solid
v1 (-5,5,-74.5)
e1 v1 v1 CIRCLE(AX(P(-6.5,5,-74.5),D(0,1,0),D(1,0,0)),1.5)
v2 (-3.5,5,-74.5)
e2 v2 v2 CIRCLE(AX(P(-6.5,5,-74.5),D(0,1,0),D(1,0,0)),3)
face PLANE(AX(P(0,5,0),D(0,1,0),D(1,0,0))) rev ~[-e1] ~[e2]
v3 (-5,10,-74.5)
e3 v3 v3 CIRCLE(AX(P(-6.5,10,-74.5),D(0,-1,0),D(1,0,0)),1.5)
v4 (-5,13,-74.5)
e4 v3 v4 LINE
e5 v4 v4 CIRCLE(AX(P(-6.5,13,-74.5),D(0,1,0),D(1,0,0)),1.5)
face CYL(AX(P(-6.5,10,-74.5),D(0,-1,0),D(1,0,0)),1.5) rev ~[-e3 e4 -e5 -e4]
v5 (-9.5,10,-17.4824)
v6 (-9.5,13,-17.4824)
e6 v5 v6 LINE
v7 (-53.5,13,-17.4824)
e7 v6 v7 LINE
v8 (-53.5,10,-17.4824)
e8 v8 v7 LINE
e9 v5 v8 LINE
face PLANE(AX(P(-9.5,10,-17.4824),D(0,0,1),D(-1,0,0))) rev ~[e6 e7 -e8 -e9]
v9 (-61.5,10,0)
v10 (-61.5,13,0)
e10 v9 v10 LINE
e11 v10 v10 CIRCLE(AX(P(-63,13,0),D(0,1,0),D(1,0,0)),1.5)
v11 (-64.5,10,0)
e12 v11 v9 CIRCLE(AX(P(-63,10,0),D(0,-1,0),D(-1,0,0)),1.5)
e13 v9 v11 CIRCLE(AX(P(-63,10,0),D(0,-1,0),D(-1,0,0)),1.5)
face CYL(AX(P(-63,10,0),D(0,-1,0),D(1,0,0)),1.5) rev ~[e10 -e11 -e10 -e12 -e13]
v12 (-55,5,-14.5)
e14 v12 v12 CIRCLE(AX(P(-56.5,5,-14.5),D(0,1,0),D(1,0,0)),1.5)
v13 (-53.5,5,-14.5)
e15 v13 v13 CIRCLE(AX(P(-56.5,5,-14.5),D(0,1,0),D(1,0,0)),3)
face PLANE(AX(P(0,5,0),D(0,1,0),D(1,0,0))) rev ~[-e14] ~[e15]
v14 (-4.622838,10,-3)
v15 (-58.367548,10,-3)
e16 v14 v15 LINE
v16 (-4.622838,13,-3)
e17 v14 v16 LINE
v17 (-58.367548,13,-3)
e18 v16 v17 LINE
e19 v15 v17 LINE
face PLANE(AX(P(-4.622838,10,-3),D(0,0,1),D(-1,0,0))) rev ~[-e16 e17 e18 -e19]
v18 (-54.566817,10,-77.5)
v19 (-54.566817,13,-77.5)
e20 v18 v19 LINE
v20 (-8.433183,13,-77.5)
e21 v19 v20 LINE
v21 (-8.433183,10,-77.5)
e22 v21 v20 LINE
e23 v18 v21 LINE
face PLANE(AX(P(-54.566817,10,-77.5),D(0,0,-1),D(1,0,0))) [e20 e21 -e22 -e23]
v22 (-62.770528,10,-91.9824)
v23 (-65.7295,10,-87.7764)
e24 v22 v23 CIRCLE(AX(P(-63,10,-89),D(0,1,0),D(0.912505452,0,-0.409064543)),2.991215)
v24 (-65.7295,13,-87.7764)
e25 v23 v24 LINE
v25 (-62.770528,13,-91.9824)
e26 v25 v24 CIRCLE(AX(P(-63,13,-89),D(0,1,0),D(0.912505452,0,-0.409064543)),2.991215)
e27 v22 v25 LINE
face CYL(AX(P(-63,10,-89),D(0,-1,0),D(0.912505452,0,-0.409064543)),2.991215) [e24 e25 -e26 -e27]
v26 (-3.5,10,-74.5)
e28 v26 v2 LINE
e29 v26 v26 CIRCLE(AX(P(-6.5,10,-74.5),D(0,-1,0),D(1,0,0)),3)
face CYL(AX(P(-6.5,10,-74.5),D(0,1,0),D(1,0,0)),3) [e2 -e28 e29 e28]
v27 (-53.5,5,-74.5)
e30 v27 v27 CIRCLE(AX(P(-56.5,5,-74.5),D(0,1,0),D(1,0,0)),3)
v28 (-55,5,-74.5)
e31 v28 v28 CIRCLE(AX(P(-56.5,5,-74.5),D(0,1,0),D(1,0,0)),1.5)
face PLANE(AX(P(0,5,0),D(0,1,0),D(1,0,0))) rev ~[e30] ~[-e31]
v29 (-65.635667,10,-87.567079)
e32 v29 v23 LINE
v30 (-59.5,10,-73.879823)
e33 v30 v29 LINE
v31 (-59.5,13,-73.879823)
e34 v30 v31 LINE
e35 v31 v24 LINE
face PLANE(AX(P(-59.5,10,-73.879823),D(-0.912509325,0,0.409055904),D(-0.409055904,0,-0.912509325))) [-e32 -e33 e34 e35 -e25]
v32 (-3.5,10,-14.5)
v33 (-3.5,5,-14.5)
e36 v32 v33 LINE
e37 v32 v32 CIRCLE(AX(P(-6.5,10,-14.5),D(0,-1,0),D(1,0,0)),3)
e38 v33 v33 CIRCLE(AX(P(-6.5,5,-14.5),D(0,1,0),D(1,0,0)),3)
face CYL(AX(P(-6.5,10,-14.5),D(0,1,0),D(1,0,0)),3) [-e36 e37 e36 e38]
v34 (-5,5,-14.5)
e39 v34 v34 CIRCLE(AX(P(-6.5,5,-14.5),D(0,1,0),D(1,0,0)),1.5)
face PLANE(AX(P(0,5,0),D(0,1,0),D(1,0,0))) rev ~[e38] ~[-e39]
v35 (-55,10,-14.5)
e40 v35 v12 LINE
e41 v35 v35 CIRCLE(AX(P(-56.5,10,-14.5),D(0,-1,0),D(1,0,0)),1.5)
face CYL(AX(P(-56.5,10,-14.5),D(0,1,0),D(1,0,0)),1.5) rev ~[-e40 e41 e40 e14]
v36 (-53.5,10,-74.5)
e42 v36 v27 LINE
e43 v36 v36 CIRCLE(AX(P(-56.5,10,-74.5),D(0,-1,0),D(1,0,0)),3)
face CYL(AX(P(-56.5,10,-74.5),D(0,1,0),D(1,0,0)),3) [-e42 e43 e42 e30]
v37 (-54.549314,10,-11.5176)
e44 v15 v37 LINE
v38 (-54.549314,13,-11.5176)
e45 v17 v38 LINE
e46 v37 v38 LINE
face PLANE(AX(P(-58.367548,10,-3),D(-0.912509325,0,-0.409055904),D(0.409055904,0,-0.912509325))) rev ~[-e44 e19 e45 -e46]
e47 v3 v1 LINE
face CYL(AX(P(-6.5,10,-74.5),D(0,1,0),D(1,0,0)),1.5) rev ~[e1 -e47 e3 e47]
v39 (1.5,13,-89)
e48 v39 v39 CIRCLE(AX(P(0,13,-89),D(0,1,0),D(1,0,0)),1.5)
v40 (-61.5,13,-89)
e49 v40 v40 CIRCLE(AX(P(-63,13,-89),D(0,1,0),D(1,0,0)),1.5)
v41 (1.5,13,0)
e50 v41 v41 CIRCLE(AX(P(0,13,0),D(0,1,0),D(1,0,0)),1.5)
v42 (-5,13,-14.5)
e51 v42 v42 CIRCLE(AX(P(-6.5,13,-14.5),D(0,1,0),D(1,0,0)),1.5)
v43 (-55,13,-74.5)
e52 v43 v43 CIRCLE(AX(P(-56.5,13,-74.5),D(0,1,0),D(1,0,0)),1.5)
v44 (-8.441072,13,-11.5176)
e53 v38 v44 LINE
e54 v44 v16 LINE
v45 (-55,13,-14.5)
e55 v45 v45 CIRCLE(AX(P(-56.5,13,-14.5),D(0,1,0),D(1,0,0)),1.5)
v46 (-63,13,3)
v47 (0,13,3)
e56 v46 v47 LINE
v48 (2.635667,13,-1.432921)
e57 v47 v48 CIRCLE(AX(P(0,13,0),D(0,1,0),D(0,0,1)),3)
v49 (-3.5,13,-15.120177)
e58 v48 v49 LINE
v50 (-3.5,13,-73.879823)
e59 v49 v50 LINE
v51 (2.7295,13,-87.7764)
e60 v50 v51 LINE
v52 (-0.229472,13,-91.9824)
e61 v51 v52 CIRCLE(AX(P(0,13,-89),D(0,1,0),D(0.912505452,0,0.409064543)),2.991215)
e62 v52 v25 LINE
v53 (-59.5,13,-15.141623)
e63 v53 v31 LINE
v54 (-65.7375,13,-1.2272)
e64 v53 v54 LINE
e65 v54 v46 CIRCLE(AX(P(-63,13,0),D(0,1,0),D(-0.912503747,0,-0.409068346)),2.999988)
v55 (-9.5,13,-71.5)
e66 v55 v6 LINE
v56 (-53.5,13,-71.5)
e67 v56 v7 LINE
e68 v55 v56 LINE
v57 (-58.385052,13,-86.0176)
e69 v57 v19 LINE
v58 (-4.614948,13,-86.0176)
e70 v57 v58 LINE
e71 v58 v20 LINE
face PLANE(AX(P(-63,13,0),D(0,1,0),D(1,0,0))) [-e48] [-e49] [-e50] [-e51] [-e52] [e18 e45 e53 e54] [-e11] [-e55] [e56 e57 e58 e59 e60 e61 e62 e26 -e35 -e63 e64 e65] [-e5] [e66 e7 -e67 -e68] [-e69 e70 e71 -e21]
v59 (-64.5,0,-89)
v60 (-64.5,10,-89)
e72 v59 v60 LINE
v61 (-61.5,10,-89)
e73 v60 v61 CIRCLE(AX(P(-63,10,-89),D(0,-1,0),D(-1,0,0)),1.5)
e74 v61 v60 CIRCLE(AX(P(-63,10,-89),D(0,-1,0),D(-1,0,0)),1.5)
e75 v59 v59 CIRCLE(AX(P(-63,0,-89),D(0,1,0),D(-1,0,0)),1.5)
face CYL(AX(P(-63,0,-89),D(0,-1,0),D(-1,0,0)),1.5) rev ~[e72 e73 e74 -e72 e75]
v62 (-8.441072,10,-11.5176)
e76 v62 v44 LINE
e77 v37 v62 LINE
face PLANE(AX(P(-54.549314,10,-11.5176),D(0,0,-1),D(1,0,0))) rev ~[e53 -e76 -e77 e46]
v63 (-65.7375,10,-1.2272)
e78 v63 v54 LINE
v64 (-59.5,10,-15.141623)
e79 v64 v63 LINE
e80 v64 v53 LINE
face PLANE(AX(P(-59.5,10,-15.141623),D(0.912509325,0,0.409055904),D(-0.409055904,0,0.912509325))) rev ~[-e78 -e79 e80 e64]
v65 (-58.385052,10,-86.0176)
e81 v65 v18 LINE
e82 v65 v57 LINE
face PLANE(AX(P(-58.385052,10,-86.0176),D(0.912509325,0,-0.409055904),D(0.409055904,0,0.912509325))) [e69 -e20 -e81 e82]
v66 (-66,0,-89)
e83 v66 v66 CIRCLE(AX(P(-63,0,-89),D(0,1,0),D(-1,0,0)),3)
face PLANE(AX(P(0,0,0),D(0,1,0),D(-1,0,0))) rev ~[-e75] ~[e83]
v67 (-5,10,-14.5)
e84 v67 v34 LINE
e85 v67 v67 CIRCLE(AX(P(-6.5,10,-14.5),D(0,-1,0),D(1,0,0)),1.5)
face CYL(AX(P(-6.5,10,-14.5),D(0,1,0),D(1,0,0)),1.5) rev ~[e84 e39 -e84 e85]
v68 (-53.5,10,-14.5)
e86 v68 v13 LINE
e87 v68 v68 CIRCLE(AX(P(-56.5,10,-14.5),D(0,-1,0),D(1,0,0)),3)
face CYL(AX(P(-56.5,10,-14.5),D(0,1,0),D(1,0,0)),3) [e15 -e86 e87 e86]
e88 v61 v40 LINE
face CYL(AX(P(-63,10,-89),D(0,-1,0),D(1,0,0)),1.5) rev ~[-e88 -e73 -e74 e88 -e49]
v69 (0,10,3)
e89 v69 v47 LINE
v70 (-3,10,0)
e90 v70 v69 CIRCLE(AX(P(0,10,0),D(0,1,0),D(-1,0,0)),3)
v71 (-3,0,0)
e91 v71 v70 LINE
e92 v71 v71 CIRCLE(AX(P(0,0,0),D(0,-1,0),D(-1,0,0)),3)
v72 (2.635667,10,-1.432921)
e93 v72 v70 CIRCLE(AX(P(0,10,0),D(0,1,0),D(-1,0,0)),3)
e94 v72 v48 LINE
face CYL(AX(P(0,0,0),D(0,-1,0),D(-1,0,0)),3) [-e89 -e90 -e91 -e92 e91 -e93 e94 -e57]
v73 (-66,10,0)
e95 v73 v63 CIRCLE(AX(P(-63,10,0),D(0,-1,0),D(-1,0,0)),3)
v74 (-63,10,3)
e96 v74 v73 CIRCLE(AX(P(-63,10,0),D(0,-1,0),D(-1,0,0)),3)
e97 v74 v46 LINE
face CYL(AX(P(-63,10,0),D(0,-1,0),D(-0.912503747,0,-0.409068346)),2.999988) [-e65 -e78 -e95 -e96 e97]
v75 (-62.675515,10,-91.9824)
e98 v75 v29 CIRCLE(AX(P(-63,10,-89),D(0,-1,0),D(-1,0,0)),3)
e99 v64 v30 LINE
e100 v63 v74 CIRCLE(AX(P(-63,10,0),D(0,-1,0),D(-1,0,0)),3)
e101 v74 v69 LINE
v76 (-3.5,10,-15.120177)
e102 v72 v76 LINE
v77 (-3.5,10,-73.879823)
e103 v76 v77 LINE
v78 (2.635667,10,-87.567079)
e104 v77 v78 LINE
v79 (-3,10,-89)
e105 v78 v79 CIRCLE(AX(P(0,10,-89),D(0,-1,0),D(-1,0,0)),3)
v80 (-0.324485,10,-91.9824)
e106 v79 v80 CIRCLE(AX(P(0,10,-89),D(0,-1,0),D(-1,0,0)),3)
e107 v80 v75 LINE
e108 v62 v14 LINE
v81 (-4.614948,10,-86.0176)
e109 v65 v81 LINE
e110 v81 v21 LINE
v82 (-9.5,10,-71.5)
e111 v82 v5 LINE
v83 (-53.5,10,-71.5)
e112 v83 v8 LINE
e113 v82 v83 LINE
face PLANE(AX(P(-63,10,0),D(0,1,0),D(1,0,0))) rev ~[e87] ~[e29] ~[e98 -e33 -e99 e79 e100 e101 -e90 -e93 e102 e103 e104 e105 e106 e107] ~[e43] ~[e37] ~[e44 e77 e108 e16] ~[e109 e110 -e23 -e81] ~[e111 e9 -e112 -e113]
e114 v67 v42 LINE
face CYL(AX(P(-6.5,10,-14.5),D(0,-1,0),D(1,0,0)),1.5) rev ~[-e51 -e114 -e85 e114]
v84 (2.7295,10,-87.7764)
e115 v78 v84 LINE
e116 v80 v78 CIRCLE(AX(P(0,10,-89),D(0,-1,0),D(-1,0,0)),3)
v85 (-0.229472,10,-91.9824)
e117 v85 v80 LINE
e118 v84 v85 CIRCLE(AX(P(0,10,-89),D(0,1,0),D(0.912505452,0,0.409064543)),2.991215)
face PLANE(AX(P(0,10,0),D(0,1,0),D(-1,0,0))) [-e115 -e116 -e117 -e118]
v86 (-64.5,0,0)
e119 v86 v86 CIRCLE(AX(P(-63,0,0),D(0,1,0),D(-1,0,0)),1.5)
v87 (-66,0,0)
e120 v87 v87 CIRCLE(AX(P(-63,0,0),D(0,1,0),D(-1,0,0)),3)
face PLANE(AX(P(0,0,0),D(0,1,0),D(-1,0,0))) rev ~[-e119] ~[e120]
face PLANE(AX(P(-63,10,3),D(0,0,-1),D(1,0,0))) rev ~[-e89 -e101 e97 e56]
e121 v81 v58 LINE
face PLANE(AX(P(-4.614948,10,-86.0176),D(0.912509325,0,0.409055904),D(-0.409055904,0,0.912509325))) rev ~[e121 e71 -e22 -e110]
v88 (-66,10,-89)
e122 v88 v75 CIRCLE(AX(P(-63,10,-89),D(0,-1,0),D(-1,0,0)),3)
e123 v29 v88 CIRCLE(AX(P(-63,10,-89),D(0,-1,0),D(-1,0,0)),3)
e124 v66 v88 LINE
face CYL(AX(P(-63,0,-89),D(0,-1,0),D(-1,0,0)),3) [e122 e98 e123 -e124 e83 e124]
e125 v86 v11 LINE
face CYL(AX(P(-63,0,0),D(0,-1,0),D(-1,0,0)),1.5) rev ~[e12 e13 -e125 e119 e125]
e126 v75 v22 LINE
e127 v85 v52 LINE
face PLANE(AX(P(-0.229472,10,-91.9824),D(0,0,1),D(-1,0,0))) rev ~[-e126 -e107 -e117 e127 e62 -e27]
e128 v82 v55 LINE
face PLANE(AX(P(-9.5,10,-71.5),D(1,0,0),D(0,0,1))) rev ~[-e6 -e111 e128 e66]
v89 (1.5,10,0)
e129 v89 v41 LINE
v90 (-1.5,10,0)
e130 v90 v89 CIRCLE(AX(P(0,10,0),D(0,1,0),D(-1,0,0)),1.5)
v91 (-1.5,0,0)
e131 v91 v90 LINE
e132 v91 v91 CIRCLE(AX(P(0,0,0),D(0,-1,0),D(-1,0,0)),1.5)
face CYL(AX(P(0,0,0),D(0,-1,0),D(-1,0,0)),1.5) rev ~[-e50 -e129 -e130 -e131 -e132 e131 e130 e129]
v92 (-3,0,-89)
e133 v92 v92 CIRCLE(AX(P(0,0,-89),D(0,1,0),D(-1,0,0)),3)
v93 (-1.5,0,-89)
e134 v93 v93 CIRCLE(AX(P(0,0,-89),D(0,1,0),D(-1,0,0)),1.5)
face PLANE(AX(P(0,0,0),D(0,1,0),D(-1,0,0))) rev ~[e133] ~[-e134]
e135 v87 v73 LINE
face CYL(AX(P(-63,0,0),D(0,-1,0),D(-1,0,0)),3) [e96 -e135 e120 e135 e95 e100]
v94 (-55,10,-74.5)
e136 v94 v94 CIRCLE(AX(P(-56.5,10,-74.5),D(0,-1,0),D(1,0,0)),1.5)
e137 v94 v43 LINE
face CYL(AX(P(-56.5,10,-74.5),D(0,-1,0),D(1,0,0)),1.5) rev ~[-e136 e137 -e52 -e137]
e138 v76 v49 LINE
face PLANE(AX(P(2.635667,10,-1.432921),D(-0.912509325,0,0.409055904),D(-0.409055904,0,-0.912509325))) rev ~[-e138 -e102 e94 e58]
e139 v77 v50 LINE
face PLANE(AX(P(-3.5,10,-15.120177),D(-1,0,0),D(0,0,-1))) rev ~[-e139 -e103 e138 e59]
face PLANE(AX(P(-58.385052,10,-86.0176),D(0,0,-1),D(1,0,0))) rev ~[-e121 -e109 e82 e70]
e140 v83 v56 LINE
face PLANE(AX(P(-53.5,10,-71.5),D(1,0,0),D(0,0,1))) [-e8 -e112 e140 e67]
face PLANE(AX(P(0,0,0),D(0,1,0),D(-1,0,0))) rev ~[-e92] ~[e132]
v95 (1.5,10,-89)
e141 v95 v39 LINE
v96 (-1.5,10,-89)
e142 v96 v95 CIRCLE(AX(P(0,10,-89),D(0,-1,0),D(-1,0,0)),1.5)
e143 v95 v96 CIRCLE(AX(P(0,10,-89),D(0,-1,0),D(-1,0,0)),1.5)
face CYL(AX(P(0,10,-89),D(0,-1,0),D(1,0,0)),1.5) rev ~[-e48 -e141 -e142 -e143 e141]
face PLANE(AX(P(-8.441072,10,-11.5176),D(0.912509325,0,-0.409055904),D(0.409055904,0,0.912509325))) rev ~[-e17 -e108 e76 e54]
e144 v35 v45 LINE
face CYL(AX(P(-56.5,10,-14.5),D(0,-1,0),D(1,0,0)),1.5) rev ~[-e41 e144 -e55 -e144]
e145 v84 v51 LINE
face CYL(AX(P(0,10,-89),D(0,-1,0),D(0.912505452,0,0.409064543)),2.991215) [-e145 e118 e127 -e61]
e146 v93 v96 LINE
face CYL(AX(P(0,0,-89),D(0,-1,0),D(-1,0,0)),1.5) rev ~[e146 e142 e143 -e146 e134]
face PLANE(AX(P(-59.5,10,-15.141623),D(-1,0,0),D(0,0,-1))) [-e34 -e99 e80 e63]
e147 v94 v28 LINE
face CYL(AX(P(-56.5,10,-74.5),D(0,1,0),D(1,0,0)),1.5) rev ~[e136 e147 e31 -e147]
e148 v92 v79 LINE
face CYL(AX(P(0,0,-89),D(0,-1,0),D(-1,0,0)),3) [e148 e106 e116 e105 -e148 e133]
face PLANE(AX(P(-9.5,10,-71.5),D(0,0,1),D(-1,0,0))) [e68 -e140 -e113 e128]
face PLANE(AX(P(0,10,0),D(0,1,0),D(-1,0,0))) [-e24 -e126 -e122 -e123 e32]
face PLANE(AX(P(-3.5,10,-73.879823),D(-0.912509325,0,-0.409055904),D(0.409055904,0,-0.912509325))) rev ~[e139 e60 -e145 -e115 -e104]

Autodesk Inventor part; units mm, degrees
ref_plane "YZ Plane" through (0, 0, 0) normal (1, 0, 0) x (0, 1, 0)
ref_plane "XZ Plane" through (0, 0, 0) normal (0, 1, 0) x (-1, 0, 0)
ref_plane "XY Plane" through (0, 0, 0) normal (0, 0, 1) x (1, 0, 0)
sketch "Sketch1" plane through (0, 0, 0) normal (0, 1, 0) x (-1, 0, 0)
  line L0 (0, 0) -> (63, 0)
  line L1 (63, 0) -> (63, -89)
  line L2 (63, -89) -> (0, -89)
  line L3 (0, -89) -> (0, 0)
  circle A0 centre (0, 0) radius 1.5
  circle A1 centre (63, 0) radius 1.5
  circle A2 centre (0, -89) radius 1.5
  circle A3 centre (63, -89) radius 1.5
  circle A4 centre (0, 0) radius 3
  circle A5 centre (0, -89) radius 3
  circle A6 centre (63, -89) radius 3
  circle A7 centre (63, 0) radius 3
  dimension "d0" = 63
  dimension "d1" = 89
  dimension "d2" = 3
  dimension "d3" = 3
  dimension "d4" = 3
  dimension "d5" = 3
  dimension "d6" = 6
  dimension "d7" = 6
  dimension "d8" = 6
  dimension "d9" = 6
extrude "Extrusion1" add sketch "Sketch1" along normal blind 10 contours A0 L3 A4 L0 | L0 A4 L3 A0 | A7 L1 A1 L0 | L0 A1 L1 A7 | A5 L2 A2 L3 | L3 A2 L2 A5 | A6 L2 A3 L1 | L1 A3 L2 A6
sketch "Sketch2" plane through (0, 10, 0) normal (0, 1, 0) x (1, 0, 0)
  circle A0 centre (0, 0) radius 1.5 projected
  circle A1 centre (-63, 89) radius 1.5 projected
  line L0 (0, 0) -> (-63, 0)
  line L1 (-63, 0) -> (-63, 89)
  line L2 (-63, 89) -> (0, 89)
  line L3 (0, 89) -> (0, 0)
  line L4 (-63, 44.5) -> (-31.5, 44.5)
  line L5 (-6.5, 14.5) -> (-56.5, 14.5)
  line L6 (-56.5, 14.5) -> (-56.5, 74.5)
  line L7 (-56.5, 74.5) -> (-6.5, 74.5)
  line L8 (-6.5, 74.5) -> (-6.5, 14.5)
  line L9 (-6.5, 14.5) -> (-56.5, 74.5) construction
  line L10 (-56.5, 14.5) -> (-6.5, 74.5) construction
  circle A2 centre (-56.5, 14.5) radius 1.5
  circle A3 centre (-6.5, 14.5) radius 1.5
  circle A4 centre (-6.5, 74.5) radius 1.5
  circle A5 centre (-56.5, 74.5) radius 1.5
  circle A6 centre (-56.5, 14.5) radius 3
  circle A7 centre (-56.5, 74.5) radius 3
  circle A8 centre (-6.5, 14.5) radius 3
  circle A9 centre (-6.5, 74.5) radius 3
  dimension "d12" = 50
  dimension "d13" = 60
  dimension "d14" = 3
  dimension "d15" = 3
  dimension "d16" = 3
  dimension "d17" = 3
  dimension "d18" = 6
  dimension "d19" = 6
  dimension "d20" = 6
  dimension "d21" = 6
extrude "Extrusion2" add sketch "Sketch2" against normal blind 5 contours A6 L6 A2 L5 | L5 A2 L6 A6 | A8 L8 A3 L5 | L5 A3 L8 A8 | A9 L7 A4 L8 | L8 A4 L7 A9 | A7 L7 A5 L6 | L6 A5 L7 A7
sketch "Sketch3" plane through (-63, 10, 0) normal (0, 1, 0) x (1, 0, 0)
  circle A0 centre (0, 0) radius 1.5 projected
  circle A1 centre (6.5, 14.5) radius 1.5 projected
  line L0 (0, 0) -> (6.5, 14.5) construction
  line L1 (2.7375, -1.2272) -> (9.2375, 13.2728)
  line L2 (3.7625, 15.7272) -> (-2.7375, 1.2272)
  arc A2 (-2.7375, 1.2272) -> (2.7375, -1.2272) centre (0, 0) ccw
  arc A3 (9.2375, 13.2728) -> (3.7625, 15.7272) centre (6.5, 14.5) ccw
  circle A4 centre (6.5, 74.5) radius 1.5 projected
  line L3 (6.5, 14.5) -> (6.5, 74.5) construction
  line L4 (3.5, 14.5) -> (3.5, 74.5)
  line L5 (9.5, 74.5) -> (9.5, 14.5)
  arc A5 (3.5, 14.5) -> (9.5, 14.5) centre (6.5, 14.5) ccw
  arc A6 (9.5, 74.5) -> (3.5, 74.5) centre (6.5, 74.5) ccw
  circle A7 centre (0, 89) radius 1.5 projected
  line L6 (6.5, 74.5) -> (0, 89) construction
  line L7 (3.7705, 73.2764) -> (-2.7295, 87.7764)
  line L8 (2.7295, 90.2236) -> (9.2295, 75.7236)
  arc A8 (3.7705, 73.2764) -> (9.2295, 75.7236) centre (6.5, 74.5) ccw
  arc A9 (2.7295, 90.2236) -> (-2.7295, 87.7764) centre (0, 89) ccw
  circle A10 centre (63, 89) radius 1.5 projected
  line L9 (0, 89) -> (63, 89) construction
  line L10 (0, 86.0176) -> (63, 86.0176)
  line L11 (63, 91.9824) -> (0, 91.9824)
  arc A11 (0, 91.9824) -> (0, 86.0176) centre (0, 89) ccw
  arc A12 (63, 86.0176) -> (63, 91.9824) centre (63, 89) ccw
  circle A13 centre (56.5, 74.5) radius 1.5 projected
  line L12 (63, 89) -> (56.5, 74.5) construction
  line L13 (60.2705, 90.2236) -> (53.7705, 75.7236)
  line L14 (59.2295, 73.2764) -> (65.7295, 87.7764)
  arc A14 (65.7295, 87.7764) -> (60.2705, 90.2236) centre (63, 89) ccw
  arc A15 (53.7705, 75.7236) -> (59.2295, 73.2764) centre (56.5, 74.5) ccw
  circle A16 centre (56.5, 14.5) radius 1.5 projected
  line L15 (56.5, 74.5) -> (56.5, 14.5) construction
  line L16 (53.5, 74.5) -> (53.5, 14.5)
  line L17 (59.5, 14.5) -> (59.5, 74.5)
  arc A17 (59.5, 74.5) -> (53.5, 74.5) centre (56.5, 74.5) ccw
  arc A18 (53.5, 14.5) -> (59.5, 14.5) centre (56.5, 14.5) ccw
  line L18 (56.5, 14.5) -> (63, 0) construction
  line L19 (53.7705, 13.2764) -> (60.2705, -1.2236)
  line L20 (65.7295, 1.2236) -> (59.2295, 15.7236)
  arc A19 (59.2295, 15.7236) -> (53.7705, 13.2764) centre (56.5, 14.5) ccw
  arc A20 (60.2705, -1.2236) -> (65.7295, 1.2236) centre (63, 0) ccw
  line L21 (63, 0) -> (0, 0) construction
  line L22 (63, 3) -> (0, 3)
  line L23 (0, -3) -> (63, -3)
  arc A21 (63, -3) -> (63, 3) centre (63, 0) ccw
  arc A22 (0, 3) -> (0, -3) centre (0, 0) ccw
  line L24 (6.5, 14.5) -> (56.5, 14.5) construction
  line L25 (6.5, 11.5176) -> (56.5, 11.5176)
  line L26 (56.5, 17.4824) -> (6.5, 17.4824)
  arc A23 (6.5, 17.4824) -> (6.5, 11.5176) centre (6.5, 14.5) ccw
  arc A24 (56.5, 11.5176) -> (56.5, 17.4824) centre (56.5, 14.5) ccw
  line L27 (6.5, 74.5) -> (56.5, 74.5) construction
  line L28 (6.5, 77.5) -> (56.5, 77.5)
  line L29 (56.5, 71.5) -> (6.5, 71.5)
  arc A25 (6.5, 77.5) -> (6.5, 71.5) centre (6.5, 74.5) ccw
  arc A26 (56.5, 71.5) -> (56.5, 77.5) centre (56.5, 74.5) ccw
  circle A27 centre (63, 0) radius 1.5 projected
  circle A28 centre (63, 0) radius 1.5
  circle A29 centre (63, 89) radius 1.5
  circle A30 centre (0, 89) radius 1.5
  point P0 (3.25, 7.25)
  point P1 (6.5, 44.5)
  point P2 (3.25, 81.75)
  point P3 (31.5, 89)
  point P4 (59.75, 81.75)
  point P5 (56.5, 44.5)
  point P6 (59.75, 7.25)
  point P7 (31.5, 0)
  point P8 (31.5, 14.5)
  point P9 (31.5, 74.5)
  point P10 (0.2294, 91.9824)
  point P11 (3.5, 73.8799)
  point P12 (3.5, 15.1417)
  point P13 (65.6357, 1.4329)
  point P14 (59.5, 15.1202)
  point P15 (59.5, 73.8799)
  point P16 (62.7706, 91.9824)
  point P17 (54.5589, 11.5176)
  point P18 (58.3772, 3)
  point P19 (4.6325, 3)
  point P20 (8.4507, 11.5176)
  point P21 (53.5, 17.4824)
  point P22 (9.5, 17.4824)
  point P23 (9.5, 71.5)
  point P24 (53.5, 71.5)
  point P25 (4.6149, 86.0176)
  point P26 (58.3851, 86.0176)
  point P27 (54.5669, 77.5)
  point P28 (8.4331, 77.5)
  point P29 (3.5, 22.3126)
  point P30 (9.5, 14.5)
  point P31 (9.1353, 75.9335)
  point P32 (53.8647, 75.9335)
  point P33 (53.8643, 13.0671)
  point P34 (7.8263, -3)
  point P35 (14.3193, 11.5176)
  point P36 (6.8244, 17.4824)
  point P37 (56.2706, 17.4824)
  point P38 (3.6764, 73.4864)
  point P39 (6.2021, 82.4768)
  point P40 (56.7979, 82.4768)
  point P41 (59.3236, 73.4864)
  dimension "d26" = 6
  dimension "d27" = 6
extrude "Extrusion3" add sketch "Sketch3" along normal blind 3 contours A2 A22 L22 L1 | L1 L22 L19 A20 L20 A21 L23 A2 | L22 A22 L2 L4 A5 L25 L1 | L25 A5 L1 | L1 A3 L5 L26 L16 A18 L19 L25 | L22 A21 L20 A20 L19 | L19 L25 A18 L17 L20 A21 L22 | A5 L25 A23 L26 A3 | A5 L4 L2 A3 L26 A23 L25 | L19 A18 L25 | L4 L7 A25 L29 L5 L26 A3 L2 | A3 L26 L5 | L19 A19 L26 A24 L25 A18 | A18 L16 L26 A19 L19 | L25 A24 L26 A19 L20 L17 A18 | L7 A9 L11 A11 L10 L8 L28 A6 L4 | L4 A25 L7 | L20 A19 L26 L16 L29 A26 L14 L17 | A6 L8 A8 L7 A25 | L7 A8 L8 A6 L5 L29 A25 | L17 A17 L28 L13 L10 A12 L11 A14 L14 | L14 A26 L17 | L5 A6 L8 L28 L13 A17 L16 L29 | L28 L8 A6 | L11 A14 L13 L10 L8 A9 | A9 L8 L10 A11 L11 | A26 L29 L16 A17 L13 A15 L14 | L14 A15 L13 A17 A26 | L11 A12 L10 L13 A14 | A17 L13 L28
properties part number "RP_mounting_cover"
